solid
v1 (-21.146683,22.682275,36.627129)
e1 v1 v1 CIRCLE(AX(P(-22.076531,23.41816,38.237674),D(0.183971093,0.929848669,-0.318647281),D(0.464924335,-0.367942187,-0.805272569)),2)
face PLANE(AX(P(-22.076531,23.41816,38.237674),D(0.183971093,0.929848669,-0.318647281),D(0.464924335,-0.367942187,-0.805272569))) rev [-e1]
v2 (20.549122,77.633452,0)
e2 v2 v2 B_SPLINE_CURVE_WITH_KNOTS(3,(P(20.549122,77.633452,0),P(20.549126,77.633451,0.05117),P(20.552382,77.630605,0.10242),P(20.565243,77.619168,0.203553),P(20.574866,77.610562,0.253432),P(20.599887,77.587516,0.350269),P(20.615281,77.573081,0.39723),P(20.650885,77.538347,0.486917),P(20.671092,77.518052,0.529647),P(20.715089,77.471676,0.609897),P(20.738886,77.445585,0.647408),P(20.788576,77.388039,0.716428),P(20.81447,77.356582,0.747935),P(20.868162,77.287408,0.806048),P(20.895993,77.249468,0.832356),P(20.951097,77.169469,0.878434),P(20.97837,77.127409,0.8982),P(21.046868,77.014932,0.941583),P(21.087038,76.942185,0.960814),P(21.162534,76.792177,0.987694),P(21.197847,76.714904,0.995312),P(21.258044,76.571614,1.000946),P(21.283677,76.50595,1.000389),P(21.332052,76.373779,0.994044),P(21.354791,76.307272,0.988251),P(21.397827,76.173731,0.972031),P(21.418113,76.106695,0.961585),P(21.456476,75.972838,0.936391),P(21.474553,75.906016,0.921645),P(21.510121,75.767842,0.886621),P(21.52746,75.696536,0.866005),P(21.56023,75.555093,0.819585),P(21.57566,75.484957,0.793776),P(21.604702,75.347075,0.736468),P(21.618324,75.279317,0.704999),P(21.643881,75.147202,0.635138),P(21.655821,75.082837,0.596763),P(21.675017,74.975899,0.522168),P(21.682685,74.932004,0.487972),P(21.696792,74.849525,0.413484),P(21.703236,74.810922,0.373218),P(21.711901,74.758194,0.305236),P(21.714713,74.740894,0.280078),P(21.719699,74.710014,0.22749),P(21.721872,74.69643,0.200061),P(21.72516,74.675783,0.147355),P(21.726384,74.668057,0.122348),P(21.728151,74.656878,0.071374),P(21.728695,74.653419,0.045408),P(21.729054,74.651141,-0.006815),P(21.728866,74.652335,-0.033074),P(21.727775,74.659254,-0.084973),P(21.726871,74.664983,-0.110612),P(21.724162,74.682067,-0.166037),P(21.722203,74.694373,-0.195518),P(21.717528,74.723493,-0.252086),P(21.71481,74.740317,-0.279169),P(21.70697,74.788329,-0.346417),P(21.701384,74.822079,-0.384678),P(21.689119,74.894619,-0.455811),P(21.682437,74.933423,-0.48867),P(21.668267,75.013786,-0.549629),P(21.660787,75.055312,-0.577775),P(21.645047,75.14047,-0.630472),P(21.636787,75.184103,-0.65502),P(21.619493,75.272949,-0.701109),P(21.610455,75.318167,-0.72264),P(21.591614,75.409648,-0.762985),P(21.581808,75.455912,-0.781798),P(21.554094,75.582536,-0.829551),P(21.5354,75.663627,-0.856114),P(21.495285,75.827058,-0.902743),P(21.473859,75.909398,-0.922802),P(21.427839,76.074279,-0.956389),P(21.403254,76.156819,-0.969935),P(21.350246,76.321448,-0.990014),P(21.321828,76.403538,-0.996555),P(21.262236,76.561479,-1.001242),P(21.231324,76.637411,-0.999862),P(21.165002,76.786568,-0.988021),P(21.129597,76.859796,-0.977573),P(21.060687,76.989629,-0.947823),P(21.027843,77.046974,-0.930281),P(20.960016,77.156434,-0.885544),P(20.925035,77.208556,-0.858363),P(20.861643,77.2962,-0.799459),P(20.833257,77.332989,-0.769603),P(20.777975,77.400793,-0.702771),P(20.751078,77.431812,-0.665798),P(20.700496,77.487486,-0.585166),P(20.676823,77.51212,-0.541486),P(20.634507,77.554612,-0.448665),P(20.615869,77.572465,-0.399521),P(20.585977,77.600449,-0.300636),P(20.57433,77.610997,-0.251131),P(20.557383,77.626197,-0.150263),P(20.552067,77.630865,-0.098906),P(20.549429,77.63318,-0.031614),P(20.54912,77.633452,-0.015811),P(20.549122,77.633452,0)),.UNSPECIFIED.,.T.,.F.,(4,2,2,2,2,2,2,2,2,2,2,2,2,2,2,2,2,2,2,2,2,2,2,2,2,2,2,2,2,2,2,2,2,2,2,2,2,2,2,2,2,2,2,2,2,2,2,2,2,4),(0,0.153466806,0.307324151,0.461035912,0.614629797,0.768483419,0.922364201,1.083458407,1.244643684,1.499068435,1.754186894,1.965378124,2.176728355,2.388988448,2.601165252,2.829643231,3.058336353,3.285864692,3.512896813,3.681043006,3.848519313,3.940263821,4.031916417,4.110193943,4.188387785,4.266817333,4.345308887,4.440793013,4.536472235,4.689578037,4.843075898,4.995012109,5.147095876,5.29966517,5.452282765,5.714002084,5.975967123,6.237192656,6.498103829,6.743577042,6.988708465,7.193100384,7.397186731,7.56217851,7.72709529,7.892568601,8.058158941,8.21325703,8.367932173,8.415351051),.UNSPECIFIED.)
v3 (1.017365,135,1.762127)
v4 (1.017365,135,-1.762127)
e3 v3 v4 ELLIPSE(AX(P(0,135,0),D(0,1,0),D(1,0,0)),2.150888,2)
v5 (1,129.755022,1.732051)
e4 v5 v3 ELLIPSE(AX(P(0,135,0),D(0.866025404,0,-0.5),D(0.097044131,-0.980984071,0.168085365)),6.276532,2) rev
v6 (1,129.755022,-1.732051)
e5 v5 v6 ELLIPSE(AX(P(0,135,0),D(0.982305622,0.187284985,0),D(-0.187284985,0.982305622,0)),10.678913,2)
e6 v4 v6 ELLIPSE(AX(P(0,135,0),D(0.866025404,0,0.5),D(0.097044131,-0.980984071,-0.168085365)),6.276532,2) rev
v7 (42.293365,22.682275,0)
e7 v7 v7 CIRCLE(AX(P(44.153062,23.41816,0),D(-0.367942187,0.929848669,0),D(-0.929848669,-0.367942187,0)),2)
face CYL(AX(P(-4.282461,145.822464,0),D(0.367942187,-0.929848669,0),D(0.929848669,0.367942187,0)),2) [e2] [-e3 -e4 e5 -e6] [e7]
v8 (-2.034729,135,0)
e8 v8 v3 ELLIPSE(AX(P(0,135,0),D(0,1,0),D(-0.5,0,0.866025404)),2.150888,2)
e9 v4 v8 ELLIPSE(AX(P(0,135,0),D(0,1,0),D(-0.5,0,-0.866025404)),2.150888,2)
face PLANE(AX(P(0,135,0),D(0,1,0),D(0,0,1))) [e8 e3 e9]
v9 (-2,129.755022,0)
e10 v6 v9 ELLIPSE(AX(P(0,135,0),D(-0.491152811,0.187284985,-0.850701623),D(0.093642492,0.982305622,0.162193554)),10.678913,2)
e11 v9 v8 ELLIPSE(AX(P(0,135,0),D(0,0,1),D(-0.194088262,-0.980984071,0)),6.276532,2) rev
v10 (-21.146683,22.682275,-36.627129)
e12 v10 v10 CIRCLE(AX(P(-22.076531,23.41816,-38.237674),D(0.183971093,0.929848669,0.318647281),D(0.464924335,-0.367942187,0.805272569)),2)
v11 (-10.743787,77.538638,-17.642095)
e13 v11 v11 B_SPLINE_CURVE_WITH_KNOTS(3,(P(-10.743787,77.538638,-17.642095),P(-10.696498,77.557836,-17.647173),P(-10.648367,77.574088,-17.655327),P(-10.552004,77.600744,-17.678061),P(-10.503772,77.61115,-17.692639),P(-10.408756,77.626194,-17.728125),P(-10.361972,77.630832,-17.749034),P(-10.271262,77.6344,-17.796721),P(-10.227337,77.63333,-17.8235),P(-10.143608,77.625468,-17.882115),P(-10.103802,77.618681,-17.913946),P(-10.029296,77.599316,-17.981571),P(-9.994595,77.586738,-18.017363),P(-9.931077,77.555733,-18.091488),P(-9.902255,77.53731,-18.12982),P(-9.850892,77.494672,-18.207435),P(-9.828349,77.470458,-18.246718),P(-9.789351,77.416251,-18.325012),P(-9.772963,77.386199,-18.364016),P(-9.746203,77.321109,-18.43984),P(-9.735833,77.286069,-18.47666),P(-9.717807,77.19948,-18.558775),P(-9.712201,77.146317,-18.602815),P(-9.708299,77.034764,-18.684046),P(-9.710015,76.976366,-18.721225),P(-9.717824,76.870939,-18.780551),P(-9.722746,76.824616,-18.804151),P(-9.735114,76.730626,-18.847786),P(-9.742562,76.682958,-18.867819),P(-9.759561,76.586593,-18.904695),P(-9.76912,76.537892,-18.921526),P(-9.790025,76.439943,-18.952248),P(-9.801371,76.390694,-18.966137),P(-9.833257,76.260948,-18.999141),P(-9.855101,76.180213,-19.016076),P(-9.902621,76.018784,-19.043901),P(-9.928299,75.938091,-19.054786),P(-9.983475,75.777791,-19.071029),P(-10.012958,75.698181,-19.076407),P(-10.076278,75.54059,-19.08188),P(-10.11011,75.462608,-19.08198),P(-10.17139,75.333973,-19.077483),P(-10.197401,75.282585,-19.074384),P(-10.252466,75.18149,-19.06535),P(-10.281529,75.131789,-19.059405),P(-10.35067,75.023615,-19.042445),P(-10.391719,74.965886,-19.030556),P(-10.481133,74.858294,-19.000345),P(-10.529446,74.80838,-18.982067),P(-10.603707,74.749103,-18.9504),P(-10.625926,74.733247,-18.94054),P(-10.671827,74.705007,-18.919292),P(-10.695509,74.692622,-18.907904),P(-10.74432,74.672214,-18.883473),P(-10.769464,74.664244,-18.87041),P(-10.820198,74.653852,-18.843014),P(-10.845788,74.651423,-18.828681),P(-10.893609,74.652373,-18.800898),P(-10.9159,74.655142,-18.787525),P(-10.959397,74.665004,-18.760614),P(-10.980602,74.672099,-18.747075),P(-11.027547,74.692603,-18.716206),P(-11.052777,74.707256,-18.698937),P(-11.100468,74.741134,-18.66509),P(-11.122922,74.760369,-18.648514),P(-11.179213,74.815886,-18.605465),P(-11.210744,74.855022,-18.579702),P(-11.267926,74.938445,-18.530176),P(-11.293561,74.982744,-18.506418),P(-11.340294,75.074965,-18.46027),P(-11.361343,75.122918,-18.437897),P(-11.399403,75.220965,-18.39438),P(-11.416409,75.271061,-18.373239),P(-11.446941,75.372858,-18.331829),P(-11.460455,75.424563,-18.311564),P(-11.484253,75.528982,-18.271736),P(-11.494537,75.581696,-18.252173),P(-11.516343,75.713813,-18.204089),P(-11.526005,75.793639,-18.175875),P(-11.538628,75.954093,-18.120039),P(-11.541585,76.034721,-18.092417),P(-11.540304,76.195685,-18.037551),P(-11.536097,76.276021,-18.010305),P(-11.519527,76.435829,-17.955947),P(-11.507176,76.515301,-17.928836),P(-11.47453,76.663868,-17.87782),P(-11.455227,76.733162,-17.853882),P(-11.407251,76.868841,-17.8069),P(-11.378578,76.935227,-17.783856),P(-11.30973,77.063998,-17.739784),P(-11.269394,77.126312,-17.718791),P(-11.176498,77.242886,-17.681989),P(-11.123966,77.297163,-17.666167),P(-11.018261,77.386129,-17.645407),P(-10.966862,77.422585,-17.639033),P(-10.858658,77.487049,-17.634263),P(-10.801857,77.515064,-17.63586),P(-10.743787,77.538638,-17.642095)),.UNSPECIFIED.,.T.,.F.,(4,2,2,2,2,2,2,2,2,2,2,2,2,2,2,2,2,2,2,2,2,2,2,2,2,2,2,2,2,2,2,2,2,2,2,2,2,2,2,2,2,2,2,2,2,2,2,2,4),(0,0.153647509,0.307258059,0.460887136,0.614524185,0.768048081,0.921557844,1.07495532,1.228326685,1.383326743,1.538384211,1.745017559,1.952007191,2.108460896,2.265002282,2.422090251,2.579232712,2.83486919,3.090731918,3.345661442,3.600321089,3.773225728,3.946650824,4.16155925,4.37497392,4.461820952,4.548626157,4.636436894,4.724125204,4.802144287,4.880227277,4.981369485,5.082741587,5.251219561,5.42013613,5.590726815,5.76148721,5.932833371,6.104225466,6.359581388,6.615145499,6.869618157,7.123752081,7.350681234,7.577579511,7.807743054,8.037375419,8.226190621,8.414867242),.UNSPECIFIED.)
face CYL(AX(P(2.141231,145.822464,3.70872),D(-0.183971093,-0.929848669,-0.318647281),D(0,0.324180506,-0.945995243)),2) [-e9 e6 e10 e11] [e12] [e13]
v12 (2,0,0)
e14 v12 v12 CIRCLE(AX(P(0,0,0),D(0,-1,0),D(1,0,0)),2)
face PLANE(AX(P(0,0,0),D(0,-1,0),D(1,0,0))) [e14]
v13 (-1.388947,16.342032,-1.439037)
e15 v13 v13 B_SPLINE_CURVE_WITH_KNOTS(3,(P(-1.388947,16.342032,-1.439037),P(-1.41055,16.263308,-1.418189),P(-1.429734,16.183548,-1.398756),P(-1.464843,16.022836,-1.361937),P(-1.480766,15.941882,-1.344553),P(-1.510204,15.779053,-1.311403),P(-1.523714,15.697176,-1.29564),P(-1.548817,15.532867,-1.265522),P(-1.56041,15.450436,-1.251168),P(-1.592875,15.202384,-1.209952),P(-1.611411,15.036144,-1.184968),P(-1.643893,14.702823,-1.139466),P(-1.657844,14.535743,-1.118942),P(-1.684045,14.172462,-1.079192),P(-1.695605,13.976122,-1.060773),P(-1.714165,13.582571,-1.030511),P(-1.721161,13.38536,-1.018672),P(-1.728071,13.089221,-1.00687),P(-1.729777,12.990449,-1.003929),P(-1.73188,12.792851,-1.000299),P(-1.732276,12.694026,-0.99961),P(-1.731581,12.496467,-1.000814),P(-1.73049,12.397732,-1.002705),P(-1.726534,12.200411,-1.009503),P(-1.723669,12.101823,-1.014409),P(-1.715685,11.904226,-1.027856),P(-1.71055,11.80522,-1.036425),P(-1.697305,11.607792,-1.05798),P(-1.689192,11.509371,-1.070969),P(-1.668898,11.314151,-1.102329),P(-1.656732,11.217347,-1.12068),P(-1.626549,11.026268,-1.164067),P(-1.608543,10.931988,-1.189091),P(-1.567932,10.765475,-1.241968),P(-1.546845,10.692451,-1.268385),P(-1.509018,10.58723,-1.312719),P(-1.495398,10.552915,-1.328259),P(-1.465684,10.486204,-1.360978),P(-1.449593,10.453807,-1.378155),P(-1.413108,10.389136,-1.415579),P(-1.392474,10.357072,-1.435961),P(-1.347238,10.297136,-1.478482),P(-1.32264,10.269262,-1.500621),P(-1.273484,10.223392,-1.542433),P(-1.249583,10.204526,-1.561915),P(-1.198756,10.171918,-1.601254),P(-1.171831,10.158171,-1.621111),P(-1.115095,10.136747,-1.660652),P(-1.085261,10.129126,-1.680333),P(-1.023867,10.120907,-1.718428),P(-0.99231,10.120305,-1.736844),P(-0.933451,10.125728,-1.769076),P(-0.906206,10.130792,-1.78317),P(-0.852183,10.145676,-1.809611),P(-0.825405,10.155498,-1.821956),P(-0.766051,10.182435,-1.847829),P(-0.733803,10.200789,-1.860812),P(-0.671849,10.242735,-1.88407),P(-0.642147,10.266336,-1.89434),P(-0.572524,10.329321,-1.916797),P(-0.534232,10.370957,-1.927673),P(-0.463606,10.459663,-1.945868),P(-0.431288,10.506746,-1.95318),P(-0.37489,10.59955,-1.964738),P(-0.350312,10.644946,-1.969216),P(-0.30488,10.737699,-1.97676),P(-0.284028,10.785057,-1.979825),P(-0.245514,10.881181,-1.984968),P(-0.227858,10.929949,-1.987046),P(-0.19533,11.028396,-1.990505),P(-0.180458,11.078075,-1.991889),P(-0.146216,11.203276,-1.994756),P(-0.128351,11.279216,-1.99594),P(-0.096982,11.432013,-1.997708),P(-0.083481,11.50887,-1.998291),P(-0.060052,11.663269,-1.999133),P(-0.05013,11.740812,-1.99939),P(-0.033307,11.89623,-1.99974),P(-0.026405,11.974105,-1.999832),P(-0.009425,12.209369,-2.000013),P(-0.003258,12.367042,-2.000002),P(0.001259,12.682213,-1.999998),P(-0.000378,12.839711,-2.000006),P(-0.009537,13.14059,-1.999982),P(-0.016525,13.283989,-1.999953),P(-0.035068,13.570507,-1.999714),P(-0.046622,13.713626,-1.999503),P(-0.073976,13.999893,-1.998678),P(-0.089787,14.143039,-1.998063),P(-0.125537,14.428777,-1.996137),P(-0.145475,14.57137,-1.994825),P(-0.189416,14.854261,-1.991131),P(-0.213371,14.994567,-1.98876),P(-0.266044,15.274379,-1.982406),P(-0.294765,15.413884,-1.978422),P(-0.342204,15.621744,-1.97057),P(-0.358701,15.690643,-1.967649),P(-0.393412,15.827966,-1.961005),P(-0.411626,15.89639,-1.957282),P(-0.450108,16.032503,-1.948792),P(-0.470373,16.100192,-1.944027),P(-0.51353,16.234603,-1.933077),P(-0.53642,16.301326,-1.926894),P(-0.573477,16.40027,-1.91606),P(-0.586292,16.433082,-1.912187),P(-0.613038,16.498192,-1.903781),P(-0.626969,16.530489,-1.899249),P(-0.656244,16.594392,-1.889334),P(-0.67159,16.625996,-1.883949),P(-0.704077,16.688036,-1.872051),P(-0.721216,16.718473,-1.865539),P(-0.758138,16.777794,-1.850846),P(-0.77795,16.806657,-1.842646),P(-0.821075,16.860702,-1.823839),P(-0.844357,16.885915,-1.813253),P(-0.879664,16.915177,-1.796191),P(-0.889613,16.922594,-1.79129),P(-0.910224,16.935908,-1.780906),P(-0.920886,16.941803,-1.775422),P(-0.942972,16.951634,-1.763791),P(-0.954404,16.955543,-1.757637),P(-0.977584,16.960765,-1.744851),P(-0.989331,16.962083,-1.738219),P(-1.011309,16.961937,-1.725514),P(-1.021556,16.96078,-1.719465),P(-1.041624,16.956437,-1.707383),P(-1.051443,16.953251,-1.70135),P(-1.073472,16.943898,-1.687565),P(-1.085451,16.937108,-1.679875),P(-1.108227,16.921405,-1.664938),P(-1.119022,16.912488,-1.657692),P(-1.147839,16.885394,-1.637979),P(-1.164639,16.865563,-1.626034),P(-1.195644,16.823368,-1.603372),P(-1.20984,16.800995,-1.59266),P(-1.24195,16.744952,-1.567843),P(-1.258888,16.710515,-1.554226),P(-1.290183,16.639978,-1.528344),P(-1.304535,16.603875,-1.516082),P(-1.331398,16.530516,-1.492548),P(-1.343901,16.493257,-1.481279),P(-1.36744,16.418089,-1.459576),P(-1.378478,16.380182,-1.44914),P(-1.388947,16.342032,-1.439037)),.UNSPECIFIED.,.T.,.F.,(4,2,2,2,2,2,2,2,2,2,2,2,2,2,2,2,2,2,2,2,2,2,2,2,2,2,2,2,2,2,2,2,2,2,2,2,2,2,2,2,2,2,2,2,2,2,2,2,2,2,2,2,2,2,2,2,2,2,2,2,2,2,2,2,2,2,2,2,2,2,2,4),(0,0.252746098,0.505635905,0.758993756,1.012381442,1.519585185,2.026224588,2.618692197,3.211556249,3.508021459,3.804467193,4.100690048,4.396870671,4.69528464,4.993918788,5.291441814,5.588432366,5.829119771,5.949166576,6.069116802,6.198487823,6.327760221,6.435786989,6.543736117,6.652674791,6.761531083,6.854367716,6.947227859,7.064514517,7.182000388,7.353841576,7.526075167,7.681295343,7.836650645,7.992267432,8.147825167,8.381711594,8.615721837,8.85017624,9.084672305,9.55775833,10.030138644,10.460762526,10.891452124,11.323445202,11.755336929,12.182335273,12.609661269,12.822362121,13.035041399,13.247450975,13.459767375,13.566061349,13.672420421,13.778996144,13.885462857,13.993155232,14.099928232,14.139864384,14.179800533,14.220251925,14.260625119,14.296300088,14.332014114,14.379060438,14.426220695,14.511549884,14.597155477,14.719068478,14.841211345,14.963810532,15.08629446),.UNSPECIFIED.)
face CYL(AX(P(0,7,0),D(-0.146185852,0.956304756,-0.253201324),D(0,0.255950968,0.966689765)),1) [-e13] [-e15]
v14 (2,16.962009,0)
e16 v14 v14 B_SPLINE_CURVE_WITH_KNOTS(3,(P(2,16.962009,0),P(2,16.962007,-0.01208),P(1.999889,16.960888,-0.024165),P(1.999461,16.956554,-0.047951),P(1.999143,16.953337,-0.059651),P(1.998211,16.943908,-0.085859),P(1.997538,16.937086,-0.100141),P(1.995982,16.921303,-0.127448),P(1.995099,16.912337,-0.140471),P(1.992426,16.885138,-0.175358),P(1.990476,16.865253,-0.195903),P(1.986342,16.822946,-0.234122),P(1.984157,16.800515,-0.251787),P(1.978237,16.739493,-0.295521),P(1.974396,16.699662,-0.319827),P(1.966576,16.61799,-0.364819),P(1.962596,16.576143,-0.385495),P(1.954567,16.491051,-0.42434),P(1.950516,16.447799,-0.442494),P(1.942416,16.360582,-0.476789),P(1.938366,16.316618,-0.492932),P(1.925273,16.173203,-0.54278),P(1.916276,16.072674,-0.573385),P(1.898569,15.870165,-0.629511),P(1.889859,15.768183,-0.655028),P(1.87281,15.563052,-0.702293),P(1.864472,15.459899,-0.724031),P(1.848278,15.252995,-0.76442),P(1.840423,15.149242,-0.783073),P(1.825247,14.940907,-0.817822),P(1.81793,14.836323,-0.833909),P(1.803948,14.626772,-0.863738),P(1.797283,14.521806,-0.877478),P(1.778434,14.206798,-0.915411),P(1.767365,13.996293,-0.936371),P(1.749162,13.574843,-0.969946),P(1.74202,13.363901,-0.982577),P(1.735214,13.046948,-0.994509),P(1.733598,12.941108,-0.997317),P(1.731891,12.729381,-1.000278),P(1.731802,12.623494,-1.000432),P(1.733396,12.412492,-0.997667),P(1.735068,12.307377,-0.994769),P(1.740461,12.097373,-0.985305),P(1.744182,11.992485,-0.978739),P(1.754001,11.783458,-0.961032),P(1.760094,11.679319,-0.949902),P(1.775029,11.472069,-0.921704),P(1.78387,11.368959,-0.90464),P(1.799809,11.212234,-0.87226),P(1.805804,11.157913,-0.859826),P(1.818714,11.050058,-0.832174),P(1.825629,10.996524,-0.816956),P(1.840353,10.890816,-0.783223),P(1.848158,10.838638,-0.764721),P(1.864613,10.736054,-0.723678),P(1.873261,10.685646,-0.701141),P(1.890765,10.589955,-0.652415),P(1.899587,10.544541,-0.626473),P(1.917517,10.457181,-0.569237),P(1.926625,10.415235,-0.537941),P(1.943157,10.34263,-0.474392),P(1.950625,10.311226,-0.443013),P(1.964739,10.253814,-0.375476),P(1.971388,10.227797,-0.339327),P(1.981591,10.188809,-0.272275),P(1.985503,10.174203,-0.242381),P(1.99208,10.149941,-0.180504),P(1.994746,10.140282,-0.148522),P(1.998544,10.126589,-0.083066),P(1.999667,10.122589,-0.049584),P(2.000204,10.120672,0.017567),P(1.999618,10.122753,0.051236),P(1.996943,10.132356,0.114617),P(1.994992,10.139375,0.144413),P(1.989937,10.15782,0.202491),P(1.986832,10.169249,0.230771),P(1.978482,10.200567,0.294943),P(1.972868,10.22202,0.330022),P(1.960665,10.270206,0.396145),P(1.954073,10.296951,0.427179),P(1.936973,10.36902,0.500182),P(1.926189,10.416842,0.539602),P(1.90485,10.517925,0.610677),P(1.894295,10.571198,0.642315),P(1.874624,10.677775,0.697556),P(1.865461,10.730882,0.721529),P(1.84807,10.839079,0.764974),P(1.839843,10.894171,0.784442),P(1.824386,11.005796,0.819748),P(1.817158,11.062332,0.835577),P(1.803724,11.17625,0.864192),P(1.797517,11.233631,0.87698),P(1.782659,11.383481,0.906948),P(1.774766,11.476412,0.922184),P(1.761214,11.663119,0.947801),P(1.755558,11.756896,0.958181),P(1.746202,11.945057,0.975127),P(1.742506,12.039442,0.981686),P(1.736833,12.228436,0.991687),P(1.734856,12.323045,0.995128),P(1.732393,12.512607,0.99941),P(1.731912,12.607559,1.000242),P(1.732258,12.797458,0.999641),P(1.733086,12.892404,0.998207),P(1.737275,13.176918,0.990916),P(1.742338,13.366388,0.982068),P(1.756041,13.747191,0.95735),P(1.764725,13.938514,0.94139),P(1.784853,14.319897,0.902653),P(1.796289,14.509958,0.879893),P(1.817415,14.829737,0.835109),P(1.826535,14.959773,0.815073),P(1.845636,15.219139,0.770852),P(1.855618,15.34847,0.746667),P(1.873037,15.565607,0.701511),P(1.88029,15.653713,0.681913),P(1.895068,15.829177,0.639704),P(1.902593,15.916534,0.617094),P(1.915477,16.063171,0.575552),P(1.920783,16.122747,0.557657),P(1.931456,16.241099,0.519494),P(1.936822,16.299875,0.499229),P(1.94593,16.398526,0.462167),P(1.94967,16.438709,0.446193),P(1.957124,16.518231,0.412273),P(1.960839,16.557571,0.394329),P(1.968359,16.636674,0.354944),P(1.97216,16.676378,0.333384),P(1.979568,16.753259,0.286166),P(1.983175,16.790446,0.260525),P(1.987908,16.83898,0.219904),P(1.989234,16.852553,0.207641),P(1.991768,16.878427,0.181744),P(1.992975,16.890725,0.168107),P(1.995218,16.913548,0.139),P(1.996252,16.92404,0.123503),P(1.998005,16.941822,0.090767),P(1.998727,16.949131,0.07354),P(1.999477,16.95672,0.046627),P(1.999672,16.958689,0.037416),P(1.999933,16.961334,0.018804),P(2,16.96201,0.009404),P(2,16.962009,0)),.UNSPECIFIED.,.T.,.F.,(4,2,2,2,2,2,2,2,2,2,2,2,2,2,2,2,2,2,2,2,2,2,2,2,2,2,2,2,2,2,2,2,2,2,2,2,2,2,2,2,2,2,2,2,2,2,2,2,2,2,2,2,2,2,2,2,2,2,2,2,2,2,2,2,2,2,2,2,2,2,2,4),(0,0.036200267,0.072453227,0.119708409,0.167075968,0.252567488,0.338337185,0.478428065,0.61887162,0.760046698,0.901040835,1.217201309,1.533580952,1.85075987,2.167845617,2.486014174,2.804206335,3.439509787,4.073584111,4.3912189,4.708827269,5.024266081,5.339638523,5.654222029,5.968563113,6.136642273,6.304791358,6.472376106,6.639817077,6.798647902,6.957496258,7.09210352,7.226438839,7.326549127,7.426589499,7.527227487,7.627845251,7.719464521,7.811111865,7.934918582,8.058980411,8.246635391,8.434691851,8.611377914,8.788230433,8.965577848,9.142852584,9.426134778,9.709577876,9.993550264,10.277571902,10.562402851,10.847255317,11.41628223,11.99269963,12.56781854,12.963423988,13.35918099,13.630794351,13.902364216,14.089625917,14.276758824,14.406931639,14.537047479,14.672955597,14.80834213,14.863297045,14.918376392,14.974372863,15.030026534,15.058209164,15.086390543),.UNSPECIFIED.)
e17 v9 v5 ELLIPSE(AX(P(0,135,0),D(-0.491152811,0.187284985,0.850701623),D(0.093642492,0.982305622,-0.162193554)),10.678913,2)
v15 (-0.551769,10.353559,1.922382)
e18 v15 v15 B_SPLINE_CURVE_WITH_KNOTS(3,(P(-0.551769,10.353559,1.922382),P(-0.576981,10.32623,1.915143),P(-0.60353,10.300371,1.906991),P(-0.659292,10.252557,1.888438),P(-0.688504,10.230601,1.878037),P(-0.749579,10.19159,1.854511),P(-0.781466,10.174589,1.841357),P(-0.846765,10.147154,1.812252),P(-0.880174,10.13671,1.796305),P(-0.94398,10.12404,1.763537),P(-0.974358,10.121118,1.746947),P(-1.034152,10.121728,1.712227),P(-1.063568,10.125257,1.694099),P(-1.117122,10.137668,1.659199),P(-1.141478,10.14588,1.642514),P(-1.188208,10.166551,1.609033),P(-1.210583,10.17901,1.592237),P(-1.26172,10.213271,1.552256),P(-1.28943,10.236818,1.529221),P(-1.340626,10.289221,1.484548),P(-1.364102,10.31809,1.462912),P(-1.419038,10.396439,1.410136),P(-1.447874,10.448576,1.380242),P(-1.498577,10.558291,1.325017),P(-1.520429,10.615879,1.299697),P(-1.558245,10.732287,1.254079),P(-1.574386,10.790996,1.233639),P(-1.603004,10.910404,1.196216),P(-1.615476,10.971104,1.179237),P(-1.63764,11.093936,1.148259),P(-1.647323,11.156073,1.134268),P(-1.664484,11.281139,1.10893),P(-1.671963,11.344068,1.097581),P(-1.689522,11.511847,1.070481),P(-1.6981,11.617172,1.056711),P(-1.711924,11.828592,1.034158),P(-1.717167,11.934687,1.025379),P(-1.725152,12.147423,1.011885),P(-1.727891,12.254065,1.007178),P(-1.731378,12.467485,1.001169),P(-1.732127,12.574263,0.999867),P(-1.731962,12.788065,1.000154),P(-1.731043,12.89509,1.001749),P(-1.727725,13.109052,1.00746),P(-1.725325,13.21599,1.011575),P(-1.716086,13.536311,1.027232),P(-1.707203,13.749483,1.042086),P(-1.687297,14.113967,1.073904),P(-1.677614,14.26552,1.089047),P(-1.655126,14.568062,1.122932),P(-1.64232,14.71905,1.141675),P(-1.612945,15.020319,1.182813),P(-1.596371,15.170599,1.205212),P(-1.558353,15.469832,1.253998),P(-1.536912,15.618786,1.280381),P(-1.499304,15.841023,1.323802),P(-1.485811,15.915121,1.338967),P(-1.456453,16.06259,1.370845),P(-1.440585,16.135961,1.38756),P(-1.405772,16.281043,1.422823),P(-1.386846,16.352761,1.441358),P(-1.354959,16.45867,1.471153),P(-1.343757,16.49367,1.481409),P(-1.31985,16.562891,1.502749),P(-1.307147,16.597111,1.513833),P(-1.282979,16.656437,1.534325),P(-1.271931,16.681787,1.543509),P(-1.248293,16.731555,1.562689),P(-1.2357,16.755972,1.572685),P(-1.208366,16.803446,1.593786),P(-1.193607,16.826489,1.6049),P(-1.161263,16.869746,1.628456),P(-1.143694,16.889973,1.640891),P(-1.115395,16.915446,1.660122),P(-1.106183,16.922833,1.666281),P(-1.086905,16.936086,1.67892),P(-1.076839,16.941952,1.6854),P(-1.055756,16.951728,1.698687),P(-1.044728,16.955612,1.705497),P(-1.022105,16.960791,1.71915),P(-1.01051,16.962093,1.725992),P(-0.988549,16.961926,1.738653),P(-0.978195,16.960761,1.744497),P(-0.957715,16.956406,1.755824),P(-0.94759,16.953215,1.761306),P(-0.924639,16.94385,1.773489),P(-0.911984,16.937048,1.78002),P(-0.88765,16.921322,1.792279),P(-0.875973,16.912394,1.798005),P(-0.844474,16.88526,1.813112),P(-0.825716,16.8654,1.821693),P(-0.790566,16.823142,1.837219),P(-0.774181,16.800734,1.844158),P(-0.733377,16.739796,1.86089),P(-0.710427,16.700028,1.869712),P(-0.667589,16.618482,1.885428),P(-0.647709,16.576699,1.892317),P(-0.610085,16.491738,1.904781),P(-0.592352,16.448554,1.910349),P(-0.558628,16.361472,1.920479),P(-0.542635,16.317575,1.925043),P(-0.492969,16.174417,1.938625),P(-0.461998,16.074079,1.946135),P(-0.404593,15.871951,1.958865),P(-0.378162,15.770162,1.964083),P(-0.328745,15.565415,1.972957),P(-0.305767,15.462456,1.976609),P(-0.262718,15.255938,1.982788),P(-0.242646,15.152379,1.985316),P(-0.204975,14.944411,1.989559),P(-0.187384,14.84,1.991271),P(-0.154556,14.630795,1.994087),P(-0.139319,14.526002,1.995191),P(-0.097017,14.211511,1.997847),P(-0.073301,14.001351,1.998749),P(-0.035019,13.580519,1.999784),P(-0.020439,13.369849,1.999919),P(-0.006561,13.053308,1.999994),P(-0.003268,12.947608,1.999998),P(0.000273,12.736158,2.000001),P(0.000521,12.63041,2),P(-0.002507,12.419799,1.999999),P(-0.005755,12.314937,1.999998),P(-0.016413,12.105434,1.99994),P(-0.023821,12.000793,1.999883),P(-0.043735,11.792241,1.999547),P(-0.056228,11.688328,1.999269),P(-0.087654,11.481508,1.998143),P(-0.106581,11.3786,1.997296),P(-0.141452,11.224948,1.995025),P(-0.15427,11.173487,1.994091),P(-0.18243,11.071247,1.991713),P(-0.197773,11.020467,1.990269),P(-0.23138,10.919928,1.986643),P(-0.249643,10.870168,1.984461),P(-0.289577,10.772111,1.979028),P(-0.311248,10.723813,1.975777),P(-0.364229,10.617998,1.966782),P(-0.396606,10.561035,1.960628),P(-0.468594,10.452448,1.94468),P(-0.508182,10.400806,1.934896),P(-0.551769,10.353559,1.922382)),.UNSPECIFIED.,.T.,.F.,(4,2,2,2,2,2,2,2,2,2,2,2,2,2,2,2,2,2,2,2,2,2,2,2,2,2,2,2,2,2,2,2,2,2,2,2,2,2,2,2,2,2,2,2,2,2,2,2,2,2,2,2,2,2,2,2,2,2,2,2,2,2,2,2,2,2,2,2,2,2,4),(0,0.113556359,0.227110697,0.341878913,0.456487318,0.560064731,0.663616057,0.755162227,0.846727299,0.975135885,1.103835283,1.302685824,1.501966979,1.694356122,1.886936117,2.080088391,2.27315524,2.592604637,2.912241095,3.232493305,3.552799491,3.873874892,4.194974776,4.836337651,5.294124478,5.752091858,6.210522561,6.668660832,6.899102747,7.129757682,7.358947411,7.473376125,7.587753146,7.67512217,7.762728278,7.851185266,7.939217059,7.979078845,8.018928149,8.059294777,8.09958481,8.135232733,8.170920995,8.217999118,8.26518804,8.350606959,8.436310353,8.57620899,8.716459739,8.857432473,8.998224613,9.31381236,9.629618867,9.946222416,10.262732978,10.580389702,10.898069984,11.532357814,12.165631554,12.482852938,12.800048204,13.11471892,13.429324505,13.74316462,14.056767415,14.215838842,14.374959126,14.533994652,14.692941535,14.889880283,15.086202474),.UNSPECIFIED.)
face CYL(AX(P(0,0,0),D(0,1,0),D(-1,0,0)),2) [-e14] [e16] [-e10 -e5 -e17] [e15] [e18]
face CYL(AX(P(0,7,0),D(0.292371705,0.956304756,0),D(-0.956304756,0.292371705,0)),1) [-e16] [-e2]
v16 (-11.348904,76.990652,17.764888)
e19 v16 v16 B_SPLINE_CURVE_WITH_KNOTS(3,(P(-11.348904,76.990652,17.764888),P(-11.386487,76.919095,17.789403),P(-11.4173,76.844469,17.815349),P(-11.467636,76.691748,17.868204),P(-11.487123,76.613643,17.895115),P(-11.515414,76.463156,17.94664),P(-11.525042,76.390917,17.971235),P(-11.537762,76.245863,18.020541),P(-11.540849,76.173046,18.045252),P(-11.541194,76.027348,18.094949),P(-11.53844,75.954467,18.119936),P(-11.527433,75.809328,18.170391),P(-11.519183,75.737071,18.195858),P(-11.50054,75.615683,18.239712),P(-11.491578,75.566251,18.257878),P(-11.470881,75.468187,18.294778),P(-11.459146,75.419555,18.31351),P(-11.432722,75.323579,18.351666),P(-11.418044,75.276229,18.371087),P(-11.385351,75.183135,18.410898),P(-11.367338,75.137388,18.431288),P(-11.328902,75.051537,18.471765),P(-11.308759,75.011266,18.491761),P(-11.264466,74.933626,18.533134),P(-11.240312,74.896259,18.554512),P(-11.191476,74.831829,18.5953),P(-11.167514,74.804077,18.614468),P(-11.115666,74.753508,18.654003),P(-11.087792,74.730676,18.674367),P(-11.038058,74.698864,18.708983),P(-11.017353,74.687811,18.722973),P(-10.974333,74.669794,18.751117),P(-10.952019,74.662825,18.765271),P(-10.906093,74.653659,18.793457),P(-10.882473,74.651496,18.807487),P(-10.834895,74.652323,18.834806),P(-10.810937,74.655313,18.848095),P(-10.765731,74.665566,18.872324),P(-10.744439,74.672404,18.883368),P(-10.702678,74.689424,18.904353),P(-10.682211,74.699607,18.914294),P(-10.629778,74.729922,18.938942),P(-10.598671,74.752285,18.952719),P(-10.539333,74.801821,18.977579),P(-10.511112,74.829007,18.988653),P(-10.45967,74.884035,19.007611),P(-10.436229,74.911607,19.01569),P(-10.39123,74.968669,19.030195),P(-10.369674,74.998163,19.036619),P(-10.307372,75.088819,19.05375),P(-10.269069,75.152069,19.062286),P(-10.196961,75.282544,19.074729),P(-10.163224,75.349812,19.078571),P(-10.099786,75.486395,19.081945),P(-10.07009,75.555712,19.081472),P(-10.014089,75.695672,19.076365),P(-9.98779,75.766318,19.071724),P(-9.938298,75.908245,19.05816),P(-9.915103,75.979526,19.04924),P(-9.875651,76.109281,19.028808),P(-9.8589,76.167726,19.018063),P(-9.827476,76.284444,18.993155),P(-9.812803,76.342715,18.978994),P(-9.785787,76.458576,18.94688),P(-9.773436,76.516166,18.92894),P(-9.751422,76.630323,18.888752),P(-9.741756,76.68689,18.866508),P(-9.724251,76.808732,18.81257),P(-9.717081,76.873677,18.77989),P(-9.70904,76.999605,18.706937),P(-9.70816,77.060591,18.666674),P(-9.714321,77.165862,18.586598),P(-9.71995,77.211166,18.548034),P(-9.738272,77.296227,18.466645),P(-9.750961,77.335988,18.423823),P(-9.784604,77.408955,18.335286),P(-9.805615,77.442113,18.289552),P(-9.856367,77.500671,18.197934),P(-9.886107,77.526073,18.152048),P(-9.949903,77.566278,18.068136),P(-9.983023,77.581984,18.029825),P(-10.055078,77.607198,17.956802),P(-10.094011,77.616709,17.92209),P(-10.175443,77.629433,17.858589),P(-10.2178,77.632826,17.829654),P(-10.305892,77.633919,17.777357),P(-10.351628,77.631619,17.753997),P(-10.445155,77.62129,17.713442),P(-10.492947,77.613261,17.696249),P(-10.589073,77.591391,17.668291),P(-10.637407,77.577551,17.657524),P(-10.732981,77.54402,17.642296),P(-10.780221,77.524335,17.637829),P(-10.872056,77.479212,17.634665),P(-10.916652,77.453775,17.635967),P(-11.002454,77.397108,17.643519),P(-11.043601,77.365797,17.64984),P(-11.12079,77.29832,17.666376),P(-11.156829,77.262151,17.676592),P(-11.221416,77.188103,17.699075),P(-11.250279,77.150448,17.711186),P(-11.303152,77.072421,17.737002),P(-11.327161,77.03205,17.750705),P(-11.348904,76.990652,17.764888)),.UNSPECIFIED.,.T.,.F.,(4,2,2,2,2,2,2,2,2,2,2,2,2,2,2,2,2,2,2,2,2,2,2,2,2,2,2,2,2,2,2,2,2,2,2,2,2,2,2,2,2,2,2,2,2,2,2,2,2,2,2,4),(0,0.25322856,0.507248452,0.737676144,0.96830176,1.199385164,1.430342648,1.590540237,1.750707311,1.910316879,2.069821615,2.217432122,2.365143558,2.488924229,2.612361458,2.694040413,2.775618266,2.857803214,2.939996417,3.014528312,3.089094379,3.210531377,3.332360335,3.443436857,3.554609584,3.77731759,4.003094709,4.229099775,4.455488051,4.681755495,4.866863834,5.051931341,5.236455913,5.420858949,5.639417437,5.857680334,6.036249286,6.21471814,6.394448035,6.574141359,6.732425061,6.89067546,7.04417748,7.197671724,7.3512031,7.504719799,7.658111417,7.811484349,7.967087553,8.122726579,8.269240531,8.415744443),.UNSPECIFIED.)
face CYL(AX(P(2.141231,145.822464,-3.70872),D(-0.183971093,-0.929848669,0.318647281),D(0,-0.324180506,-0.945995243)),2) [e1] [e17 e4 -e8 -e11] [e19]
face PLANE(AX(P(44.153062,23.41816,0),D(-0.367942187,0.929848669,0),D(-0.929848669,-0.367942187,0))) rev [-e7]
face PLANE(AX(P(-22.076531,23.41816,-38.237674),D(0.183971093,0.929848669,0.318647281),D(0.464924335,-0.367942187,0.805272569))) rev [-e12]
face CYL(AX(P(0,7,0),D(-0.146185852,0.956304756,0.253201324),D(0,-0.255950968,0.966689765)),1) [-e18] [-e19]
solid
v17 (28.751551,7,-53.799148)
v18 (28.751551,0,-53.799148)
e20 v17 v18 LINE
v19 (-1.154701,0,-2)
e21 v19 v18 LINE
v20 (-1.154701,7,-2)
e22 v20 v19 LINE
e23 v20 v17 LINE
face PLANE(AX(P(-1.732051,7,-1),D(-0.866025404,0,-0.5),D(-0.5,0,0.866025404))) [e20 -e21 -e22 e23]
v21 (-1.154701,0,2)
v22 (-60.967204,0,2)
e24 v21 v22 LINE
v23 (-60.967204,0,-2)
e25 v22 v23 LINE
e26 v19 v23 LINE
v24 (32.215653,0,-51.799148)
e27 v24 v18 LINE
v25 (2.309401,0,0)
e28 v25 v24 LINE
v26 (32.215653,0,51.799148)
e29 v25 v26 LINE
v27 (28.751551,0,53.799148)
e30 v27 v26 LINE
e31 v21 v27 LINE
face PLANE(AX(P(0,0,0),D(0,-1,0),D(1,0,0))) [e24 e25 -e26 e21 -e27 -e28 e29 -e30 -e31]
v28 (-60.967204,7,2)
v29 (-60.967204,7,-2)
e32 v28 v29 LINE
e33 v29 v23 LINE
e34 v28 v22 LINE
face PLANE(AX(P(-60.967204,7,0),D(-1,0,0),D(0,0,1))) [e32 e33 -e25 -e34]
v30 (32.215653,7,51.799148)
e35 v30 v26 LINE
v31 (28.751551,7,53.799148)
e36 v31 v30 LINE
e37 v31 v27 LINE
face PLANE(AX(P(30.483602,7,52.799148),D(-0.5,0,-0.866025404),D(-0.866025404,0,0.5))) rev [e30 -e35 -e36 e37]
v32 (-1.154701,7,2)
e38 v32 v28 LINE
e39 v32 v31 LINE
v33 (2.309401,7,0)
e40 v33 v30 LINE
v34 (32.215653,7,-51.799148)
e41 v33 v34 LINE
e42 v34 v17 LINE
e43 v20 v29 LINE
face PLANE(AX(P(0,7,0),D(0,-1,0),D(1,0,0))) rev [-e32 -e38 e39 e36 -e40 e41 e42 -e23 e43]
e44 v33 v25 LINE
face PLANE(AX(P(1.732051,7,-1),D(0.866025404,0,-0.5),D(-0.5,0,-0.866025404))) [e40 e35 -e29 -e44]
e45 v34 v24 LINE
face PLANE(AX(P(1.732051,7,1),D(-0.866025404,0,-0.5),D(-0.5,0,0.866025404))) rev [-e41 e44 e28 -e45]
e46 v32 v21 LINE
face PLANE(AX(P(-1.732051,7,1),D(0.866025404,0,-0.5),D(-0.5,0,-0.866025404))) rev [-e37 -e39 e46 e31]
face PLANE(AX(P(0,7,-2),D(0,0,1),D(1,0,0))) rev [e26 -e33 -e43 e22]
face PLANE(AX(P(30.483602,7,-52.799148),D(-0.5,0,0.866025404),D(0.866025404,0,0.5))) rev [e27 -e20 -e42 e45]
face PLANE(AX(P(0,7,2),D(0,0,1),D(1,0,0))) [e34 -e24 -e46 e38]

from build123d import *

# Parameters (mm, degrees)
SWEEP1_PROFILE_R    = 2
SWEEP2_PROFILE_R    = 1
CUT_EXTRUDE3_START  = -15
SKETCH50_R          = 5.464476383
CUT_EXTRUDE3_DEPTH  = 10.489956
CIRPATTERN2_COUNT   = 3
BOSS_EXTRUDE1_START = -7
BOSS_EXTRUDE1_DEPTH = 7


# Read off the part's stored shape, not the designer's step: Boss-Extrude1
with BuildPart() as part:
    # Sweep1: sweep along a curve in space
    with BuildLine() as sweep1_path:
        Line((0, 0, 0), (0, 135, 0))
        Line((0, 135, 0), (44.153062384, 23.418159712, 0))
    # Sweep1 profile (on start of the path) → Sweep1 (sweep)
    with BuildSketch(Plane(origin=(0, 0, 0), x_dir=(1, 0, 0), z_dir=(0, 1, 0))):
        Circle(SWEEP1_PROFILE_R)
    sweep1 = sweep(path=sweep1_path.line, transition=Transition.RIGHT)

    # Sweep2: sweep along a curve in space
    with BuildLine() as sweep2_path:
        Line((0, 7, 0), (22.076531192, 79.209079856, 0))
    # Sweep2 profile (on start of the path) → Sweep2 (sweep)
    with BuildSketch(Plane(origin=(0, 7, 0), x_dir=(0.9563047559630352, -0.2923717047227375, 0), z_dir=(0.2923717047227375, 0.9563047559630352, 0))):
        Circle(SWEEP2_PROFILE_R)
    sweep2 = sweep(path=sweep2_path.line)

    # Sketch50 → Cut-Extrude3 (cut)
    with BuildSketch(Plane(origin=(0, 150, 0), x_dir=(1, 0, 0), z_dir=(0, 1, 0)).offset(CUT_EXTRUDE3_START)):
        Circle(SKETCH50_R)
    cut_extrude3 = extrude(amount=CUT_EXTRUDE3_DEPTH, mode=Mode.SUBTRACT)

    # CirPattern2: Sweep1, Sweep2, Cut-Extrude3 ×3 about axis
    cirpattern2_axis = Axis((0, 0, 0), (0, 1, 0))
    add([sweep1.rotate(cirpattern2_axis, i * 360 / CIRPATTERN2_COUNT) for i in range(1, CIRPATTERN2_COUNT)])
    add([sweep2.rotate(cirpattern2_axis, i * 360 / CIRPATTERN2_COUNT) for i in range(1, CIRPATTERN2_COUNT)])
    add([cut_extrude3.rotate(cirpattern2_axis, i * 360 / CIRPATTERN2_COUNT) for i in range(1, CIRPATTERN2_COUNT)], mode=Mode.SUBTRACT)


with BuildPart() as body_2:
    # Boss-Extrude1 outline → Boss-Extrude1 (new body)
    with BuildSketch(Plane.XZ.offset(BOSS_EXTRUDE1_START)):
        Polygon((28.751551342, 53.79914772), (-1.154700538, 2), (-60.967204299, 2), (-60.967204299, -2), (-1.154700538, -2), (28.751551342, -53.79914772), (32.215652957, -51.79914772), (2.309401077, 0), (32.215652957, 51.79914772), align=None)
    extrude(amount=BOSS_EXTRUDE1_DEPTH)


solid = Compound([part.part, body_2.part])
